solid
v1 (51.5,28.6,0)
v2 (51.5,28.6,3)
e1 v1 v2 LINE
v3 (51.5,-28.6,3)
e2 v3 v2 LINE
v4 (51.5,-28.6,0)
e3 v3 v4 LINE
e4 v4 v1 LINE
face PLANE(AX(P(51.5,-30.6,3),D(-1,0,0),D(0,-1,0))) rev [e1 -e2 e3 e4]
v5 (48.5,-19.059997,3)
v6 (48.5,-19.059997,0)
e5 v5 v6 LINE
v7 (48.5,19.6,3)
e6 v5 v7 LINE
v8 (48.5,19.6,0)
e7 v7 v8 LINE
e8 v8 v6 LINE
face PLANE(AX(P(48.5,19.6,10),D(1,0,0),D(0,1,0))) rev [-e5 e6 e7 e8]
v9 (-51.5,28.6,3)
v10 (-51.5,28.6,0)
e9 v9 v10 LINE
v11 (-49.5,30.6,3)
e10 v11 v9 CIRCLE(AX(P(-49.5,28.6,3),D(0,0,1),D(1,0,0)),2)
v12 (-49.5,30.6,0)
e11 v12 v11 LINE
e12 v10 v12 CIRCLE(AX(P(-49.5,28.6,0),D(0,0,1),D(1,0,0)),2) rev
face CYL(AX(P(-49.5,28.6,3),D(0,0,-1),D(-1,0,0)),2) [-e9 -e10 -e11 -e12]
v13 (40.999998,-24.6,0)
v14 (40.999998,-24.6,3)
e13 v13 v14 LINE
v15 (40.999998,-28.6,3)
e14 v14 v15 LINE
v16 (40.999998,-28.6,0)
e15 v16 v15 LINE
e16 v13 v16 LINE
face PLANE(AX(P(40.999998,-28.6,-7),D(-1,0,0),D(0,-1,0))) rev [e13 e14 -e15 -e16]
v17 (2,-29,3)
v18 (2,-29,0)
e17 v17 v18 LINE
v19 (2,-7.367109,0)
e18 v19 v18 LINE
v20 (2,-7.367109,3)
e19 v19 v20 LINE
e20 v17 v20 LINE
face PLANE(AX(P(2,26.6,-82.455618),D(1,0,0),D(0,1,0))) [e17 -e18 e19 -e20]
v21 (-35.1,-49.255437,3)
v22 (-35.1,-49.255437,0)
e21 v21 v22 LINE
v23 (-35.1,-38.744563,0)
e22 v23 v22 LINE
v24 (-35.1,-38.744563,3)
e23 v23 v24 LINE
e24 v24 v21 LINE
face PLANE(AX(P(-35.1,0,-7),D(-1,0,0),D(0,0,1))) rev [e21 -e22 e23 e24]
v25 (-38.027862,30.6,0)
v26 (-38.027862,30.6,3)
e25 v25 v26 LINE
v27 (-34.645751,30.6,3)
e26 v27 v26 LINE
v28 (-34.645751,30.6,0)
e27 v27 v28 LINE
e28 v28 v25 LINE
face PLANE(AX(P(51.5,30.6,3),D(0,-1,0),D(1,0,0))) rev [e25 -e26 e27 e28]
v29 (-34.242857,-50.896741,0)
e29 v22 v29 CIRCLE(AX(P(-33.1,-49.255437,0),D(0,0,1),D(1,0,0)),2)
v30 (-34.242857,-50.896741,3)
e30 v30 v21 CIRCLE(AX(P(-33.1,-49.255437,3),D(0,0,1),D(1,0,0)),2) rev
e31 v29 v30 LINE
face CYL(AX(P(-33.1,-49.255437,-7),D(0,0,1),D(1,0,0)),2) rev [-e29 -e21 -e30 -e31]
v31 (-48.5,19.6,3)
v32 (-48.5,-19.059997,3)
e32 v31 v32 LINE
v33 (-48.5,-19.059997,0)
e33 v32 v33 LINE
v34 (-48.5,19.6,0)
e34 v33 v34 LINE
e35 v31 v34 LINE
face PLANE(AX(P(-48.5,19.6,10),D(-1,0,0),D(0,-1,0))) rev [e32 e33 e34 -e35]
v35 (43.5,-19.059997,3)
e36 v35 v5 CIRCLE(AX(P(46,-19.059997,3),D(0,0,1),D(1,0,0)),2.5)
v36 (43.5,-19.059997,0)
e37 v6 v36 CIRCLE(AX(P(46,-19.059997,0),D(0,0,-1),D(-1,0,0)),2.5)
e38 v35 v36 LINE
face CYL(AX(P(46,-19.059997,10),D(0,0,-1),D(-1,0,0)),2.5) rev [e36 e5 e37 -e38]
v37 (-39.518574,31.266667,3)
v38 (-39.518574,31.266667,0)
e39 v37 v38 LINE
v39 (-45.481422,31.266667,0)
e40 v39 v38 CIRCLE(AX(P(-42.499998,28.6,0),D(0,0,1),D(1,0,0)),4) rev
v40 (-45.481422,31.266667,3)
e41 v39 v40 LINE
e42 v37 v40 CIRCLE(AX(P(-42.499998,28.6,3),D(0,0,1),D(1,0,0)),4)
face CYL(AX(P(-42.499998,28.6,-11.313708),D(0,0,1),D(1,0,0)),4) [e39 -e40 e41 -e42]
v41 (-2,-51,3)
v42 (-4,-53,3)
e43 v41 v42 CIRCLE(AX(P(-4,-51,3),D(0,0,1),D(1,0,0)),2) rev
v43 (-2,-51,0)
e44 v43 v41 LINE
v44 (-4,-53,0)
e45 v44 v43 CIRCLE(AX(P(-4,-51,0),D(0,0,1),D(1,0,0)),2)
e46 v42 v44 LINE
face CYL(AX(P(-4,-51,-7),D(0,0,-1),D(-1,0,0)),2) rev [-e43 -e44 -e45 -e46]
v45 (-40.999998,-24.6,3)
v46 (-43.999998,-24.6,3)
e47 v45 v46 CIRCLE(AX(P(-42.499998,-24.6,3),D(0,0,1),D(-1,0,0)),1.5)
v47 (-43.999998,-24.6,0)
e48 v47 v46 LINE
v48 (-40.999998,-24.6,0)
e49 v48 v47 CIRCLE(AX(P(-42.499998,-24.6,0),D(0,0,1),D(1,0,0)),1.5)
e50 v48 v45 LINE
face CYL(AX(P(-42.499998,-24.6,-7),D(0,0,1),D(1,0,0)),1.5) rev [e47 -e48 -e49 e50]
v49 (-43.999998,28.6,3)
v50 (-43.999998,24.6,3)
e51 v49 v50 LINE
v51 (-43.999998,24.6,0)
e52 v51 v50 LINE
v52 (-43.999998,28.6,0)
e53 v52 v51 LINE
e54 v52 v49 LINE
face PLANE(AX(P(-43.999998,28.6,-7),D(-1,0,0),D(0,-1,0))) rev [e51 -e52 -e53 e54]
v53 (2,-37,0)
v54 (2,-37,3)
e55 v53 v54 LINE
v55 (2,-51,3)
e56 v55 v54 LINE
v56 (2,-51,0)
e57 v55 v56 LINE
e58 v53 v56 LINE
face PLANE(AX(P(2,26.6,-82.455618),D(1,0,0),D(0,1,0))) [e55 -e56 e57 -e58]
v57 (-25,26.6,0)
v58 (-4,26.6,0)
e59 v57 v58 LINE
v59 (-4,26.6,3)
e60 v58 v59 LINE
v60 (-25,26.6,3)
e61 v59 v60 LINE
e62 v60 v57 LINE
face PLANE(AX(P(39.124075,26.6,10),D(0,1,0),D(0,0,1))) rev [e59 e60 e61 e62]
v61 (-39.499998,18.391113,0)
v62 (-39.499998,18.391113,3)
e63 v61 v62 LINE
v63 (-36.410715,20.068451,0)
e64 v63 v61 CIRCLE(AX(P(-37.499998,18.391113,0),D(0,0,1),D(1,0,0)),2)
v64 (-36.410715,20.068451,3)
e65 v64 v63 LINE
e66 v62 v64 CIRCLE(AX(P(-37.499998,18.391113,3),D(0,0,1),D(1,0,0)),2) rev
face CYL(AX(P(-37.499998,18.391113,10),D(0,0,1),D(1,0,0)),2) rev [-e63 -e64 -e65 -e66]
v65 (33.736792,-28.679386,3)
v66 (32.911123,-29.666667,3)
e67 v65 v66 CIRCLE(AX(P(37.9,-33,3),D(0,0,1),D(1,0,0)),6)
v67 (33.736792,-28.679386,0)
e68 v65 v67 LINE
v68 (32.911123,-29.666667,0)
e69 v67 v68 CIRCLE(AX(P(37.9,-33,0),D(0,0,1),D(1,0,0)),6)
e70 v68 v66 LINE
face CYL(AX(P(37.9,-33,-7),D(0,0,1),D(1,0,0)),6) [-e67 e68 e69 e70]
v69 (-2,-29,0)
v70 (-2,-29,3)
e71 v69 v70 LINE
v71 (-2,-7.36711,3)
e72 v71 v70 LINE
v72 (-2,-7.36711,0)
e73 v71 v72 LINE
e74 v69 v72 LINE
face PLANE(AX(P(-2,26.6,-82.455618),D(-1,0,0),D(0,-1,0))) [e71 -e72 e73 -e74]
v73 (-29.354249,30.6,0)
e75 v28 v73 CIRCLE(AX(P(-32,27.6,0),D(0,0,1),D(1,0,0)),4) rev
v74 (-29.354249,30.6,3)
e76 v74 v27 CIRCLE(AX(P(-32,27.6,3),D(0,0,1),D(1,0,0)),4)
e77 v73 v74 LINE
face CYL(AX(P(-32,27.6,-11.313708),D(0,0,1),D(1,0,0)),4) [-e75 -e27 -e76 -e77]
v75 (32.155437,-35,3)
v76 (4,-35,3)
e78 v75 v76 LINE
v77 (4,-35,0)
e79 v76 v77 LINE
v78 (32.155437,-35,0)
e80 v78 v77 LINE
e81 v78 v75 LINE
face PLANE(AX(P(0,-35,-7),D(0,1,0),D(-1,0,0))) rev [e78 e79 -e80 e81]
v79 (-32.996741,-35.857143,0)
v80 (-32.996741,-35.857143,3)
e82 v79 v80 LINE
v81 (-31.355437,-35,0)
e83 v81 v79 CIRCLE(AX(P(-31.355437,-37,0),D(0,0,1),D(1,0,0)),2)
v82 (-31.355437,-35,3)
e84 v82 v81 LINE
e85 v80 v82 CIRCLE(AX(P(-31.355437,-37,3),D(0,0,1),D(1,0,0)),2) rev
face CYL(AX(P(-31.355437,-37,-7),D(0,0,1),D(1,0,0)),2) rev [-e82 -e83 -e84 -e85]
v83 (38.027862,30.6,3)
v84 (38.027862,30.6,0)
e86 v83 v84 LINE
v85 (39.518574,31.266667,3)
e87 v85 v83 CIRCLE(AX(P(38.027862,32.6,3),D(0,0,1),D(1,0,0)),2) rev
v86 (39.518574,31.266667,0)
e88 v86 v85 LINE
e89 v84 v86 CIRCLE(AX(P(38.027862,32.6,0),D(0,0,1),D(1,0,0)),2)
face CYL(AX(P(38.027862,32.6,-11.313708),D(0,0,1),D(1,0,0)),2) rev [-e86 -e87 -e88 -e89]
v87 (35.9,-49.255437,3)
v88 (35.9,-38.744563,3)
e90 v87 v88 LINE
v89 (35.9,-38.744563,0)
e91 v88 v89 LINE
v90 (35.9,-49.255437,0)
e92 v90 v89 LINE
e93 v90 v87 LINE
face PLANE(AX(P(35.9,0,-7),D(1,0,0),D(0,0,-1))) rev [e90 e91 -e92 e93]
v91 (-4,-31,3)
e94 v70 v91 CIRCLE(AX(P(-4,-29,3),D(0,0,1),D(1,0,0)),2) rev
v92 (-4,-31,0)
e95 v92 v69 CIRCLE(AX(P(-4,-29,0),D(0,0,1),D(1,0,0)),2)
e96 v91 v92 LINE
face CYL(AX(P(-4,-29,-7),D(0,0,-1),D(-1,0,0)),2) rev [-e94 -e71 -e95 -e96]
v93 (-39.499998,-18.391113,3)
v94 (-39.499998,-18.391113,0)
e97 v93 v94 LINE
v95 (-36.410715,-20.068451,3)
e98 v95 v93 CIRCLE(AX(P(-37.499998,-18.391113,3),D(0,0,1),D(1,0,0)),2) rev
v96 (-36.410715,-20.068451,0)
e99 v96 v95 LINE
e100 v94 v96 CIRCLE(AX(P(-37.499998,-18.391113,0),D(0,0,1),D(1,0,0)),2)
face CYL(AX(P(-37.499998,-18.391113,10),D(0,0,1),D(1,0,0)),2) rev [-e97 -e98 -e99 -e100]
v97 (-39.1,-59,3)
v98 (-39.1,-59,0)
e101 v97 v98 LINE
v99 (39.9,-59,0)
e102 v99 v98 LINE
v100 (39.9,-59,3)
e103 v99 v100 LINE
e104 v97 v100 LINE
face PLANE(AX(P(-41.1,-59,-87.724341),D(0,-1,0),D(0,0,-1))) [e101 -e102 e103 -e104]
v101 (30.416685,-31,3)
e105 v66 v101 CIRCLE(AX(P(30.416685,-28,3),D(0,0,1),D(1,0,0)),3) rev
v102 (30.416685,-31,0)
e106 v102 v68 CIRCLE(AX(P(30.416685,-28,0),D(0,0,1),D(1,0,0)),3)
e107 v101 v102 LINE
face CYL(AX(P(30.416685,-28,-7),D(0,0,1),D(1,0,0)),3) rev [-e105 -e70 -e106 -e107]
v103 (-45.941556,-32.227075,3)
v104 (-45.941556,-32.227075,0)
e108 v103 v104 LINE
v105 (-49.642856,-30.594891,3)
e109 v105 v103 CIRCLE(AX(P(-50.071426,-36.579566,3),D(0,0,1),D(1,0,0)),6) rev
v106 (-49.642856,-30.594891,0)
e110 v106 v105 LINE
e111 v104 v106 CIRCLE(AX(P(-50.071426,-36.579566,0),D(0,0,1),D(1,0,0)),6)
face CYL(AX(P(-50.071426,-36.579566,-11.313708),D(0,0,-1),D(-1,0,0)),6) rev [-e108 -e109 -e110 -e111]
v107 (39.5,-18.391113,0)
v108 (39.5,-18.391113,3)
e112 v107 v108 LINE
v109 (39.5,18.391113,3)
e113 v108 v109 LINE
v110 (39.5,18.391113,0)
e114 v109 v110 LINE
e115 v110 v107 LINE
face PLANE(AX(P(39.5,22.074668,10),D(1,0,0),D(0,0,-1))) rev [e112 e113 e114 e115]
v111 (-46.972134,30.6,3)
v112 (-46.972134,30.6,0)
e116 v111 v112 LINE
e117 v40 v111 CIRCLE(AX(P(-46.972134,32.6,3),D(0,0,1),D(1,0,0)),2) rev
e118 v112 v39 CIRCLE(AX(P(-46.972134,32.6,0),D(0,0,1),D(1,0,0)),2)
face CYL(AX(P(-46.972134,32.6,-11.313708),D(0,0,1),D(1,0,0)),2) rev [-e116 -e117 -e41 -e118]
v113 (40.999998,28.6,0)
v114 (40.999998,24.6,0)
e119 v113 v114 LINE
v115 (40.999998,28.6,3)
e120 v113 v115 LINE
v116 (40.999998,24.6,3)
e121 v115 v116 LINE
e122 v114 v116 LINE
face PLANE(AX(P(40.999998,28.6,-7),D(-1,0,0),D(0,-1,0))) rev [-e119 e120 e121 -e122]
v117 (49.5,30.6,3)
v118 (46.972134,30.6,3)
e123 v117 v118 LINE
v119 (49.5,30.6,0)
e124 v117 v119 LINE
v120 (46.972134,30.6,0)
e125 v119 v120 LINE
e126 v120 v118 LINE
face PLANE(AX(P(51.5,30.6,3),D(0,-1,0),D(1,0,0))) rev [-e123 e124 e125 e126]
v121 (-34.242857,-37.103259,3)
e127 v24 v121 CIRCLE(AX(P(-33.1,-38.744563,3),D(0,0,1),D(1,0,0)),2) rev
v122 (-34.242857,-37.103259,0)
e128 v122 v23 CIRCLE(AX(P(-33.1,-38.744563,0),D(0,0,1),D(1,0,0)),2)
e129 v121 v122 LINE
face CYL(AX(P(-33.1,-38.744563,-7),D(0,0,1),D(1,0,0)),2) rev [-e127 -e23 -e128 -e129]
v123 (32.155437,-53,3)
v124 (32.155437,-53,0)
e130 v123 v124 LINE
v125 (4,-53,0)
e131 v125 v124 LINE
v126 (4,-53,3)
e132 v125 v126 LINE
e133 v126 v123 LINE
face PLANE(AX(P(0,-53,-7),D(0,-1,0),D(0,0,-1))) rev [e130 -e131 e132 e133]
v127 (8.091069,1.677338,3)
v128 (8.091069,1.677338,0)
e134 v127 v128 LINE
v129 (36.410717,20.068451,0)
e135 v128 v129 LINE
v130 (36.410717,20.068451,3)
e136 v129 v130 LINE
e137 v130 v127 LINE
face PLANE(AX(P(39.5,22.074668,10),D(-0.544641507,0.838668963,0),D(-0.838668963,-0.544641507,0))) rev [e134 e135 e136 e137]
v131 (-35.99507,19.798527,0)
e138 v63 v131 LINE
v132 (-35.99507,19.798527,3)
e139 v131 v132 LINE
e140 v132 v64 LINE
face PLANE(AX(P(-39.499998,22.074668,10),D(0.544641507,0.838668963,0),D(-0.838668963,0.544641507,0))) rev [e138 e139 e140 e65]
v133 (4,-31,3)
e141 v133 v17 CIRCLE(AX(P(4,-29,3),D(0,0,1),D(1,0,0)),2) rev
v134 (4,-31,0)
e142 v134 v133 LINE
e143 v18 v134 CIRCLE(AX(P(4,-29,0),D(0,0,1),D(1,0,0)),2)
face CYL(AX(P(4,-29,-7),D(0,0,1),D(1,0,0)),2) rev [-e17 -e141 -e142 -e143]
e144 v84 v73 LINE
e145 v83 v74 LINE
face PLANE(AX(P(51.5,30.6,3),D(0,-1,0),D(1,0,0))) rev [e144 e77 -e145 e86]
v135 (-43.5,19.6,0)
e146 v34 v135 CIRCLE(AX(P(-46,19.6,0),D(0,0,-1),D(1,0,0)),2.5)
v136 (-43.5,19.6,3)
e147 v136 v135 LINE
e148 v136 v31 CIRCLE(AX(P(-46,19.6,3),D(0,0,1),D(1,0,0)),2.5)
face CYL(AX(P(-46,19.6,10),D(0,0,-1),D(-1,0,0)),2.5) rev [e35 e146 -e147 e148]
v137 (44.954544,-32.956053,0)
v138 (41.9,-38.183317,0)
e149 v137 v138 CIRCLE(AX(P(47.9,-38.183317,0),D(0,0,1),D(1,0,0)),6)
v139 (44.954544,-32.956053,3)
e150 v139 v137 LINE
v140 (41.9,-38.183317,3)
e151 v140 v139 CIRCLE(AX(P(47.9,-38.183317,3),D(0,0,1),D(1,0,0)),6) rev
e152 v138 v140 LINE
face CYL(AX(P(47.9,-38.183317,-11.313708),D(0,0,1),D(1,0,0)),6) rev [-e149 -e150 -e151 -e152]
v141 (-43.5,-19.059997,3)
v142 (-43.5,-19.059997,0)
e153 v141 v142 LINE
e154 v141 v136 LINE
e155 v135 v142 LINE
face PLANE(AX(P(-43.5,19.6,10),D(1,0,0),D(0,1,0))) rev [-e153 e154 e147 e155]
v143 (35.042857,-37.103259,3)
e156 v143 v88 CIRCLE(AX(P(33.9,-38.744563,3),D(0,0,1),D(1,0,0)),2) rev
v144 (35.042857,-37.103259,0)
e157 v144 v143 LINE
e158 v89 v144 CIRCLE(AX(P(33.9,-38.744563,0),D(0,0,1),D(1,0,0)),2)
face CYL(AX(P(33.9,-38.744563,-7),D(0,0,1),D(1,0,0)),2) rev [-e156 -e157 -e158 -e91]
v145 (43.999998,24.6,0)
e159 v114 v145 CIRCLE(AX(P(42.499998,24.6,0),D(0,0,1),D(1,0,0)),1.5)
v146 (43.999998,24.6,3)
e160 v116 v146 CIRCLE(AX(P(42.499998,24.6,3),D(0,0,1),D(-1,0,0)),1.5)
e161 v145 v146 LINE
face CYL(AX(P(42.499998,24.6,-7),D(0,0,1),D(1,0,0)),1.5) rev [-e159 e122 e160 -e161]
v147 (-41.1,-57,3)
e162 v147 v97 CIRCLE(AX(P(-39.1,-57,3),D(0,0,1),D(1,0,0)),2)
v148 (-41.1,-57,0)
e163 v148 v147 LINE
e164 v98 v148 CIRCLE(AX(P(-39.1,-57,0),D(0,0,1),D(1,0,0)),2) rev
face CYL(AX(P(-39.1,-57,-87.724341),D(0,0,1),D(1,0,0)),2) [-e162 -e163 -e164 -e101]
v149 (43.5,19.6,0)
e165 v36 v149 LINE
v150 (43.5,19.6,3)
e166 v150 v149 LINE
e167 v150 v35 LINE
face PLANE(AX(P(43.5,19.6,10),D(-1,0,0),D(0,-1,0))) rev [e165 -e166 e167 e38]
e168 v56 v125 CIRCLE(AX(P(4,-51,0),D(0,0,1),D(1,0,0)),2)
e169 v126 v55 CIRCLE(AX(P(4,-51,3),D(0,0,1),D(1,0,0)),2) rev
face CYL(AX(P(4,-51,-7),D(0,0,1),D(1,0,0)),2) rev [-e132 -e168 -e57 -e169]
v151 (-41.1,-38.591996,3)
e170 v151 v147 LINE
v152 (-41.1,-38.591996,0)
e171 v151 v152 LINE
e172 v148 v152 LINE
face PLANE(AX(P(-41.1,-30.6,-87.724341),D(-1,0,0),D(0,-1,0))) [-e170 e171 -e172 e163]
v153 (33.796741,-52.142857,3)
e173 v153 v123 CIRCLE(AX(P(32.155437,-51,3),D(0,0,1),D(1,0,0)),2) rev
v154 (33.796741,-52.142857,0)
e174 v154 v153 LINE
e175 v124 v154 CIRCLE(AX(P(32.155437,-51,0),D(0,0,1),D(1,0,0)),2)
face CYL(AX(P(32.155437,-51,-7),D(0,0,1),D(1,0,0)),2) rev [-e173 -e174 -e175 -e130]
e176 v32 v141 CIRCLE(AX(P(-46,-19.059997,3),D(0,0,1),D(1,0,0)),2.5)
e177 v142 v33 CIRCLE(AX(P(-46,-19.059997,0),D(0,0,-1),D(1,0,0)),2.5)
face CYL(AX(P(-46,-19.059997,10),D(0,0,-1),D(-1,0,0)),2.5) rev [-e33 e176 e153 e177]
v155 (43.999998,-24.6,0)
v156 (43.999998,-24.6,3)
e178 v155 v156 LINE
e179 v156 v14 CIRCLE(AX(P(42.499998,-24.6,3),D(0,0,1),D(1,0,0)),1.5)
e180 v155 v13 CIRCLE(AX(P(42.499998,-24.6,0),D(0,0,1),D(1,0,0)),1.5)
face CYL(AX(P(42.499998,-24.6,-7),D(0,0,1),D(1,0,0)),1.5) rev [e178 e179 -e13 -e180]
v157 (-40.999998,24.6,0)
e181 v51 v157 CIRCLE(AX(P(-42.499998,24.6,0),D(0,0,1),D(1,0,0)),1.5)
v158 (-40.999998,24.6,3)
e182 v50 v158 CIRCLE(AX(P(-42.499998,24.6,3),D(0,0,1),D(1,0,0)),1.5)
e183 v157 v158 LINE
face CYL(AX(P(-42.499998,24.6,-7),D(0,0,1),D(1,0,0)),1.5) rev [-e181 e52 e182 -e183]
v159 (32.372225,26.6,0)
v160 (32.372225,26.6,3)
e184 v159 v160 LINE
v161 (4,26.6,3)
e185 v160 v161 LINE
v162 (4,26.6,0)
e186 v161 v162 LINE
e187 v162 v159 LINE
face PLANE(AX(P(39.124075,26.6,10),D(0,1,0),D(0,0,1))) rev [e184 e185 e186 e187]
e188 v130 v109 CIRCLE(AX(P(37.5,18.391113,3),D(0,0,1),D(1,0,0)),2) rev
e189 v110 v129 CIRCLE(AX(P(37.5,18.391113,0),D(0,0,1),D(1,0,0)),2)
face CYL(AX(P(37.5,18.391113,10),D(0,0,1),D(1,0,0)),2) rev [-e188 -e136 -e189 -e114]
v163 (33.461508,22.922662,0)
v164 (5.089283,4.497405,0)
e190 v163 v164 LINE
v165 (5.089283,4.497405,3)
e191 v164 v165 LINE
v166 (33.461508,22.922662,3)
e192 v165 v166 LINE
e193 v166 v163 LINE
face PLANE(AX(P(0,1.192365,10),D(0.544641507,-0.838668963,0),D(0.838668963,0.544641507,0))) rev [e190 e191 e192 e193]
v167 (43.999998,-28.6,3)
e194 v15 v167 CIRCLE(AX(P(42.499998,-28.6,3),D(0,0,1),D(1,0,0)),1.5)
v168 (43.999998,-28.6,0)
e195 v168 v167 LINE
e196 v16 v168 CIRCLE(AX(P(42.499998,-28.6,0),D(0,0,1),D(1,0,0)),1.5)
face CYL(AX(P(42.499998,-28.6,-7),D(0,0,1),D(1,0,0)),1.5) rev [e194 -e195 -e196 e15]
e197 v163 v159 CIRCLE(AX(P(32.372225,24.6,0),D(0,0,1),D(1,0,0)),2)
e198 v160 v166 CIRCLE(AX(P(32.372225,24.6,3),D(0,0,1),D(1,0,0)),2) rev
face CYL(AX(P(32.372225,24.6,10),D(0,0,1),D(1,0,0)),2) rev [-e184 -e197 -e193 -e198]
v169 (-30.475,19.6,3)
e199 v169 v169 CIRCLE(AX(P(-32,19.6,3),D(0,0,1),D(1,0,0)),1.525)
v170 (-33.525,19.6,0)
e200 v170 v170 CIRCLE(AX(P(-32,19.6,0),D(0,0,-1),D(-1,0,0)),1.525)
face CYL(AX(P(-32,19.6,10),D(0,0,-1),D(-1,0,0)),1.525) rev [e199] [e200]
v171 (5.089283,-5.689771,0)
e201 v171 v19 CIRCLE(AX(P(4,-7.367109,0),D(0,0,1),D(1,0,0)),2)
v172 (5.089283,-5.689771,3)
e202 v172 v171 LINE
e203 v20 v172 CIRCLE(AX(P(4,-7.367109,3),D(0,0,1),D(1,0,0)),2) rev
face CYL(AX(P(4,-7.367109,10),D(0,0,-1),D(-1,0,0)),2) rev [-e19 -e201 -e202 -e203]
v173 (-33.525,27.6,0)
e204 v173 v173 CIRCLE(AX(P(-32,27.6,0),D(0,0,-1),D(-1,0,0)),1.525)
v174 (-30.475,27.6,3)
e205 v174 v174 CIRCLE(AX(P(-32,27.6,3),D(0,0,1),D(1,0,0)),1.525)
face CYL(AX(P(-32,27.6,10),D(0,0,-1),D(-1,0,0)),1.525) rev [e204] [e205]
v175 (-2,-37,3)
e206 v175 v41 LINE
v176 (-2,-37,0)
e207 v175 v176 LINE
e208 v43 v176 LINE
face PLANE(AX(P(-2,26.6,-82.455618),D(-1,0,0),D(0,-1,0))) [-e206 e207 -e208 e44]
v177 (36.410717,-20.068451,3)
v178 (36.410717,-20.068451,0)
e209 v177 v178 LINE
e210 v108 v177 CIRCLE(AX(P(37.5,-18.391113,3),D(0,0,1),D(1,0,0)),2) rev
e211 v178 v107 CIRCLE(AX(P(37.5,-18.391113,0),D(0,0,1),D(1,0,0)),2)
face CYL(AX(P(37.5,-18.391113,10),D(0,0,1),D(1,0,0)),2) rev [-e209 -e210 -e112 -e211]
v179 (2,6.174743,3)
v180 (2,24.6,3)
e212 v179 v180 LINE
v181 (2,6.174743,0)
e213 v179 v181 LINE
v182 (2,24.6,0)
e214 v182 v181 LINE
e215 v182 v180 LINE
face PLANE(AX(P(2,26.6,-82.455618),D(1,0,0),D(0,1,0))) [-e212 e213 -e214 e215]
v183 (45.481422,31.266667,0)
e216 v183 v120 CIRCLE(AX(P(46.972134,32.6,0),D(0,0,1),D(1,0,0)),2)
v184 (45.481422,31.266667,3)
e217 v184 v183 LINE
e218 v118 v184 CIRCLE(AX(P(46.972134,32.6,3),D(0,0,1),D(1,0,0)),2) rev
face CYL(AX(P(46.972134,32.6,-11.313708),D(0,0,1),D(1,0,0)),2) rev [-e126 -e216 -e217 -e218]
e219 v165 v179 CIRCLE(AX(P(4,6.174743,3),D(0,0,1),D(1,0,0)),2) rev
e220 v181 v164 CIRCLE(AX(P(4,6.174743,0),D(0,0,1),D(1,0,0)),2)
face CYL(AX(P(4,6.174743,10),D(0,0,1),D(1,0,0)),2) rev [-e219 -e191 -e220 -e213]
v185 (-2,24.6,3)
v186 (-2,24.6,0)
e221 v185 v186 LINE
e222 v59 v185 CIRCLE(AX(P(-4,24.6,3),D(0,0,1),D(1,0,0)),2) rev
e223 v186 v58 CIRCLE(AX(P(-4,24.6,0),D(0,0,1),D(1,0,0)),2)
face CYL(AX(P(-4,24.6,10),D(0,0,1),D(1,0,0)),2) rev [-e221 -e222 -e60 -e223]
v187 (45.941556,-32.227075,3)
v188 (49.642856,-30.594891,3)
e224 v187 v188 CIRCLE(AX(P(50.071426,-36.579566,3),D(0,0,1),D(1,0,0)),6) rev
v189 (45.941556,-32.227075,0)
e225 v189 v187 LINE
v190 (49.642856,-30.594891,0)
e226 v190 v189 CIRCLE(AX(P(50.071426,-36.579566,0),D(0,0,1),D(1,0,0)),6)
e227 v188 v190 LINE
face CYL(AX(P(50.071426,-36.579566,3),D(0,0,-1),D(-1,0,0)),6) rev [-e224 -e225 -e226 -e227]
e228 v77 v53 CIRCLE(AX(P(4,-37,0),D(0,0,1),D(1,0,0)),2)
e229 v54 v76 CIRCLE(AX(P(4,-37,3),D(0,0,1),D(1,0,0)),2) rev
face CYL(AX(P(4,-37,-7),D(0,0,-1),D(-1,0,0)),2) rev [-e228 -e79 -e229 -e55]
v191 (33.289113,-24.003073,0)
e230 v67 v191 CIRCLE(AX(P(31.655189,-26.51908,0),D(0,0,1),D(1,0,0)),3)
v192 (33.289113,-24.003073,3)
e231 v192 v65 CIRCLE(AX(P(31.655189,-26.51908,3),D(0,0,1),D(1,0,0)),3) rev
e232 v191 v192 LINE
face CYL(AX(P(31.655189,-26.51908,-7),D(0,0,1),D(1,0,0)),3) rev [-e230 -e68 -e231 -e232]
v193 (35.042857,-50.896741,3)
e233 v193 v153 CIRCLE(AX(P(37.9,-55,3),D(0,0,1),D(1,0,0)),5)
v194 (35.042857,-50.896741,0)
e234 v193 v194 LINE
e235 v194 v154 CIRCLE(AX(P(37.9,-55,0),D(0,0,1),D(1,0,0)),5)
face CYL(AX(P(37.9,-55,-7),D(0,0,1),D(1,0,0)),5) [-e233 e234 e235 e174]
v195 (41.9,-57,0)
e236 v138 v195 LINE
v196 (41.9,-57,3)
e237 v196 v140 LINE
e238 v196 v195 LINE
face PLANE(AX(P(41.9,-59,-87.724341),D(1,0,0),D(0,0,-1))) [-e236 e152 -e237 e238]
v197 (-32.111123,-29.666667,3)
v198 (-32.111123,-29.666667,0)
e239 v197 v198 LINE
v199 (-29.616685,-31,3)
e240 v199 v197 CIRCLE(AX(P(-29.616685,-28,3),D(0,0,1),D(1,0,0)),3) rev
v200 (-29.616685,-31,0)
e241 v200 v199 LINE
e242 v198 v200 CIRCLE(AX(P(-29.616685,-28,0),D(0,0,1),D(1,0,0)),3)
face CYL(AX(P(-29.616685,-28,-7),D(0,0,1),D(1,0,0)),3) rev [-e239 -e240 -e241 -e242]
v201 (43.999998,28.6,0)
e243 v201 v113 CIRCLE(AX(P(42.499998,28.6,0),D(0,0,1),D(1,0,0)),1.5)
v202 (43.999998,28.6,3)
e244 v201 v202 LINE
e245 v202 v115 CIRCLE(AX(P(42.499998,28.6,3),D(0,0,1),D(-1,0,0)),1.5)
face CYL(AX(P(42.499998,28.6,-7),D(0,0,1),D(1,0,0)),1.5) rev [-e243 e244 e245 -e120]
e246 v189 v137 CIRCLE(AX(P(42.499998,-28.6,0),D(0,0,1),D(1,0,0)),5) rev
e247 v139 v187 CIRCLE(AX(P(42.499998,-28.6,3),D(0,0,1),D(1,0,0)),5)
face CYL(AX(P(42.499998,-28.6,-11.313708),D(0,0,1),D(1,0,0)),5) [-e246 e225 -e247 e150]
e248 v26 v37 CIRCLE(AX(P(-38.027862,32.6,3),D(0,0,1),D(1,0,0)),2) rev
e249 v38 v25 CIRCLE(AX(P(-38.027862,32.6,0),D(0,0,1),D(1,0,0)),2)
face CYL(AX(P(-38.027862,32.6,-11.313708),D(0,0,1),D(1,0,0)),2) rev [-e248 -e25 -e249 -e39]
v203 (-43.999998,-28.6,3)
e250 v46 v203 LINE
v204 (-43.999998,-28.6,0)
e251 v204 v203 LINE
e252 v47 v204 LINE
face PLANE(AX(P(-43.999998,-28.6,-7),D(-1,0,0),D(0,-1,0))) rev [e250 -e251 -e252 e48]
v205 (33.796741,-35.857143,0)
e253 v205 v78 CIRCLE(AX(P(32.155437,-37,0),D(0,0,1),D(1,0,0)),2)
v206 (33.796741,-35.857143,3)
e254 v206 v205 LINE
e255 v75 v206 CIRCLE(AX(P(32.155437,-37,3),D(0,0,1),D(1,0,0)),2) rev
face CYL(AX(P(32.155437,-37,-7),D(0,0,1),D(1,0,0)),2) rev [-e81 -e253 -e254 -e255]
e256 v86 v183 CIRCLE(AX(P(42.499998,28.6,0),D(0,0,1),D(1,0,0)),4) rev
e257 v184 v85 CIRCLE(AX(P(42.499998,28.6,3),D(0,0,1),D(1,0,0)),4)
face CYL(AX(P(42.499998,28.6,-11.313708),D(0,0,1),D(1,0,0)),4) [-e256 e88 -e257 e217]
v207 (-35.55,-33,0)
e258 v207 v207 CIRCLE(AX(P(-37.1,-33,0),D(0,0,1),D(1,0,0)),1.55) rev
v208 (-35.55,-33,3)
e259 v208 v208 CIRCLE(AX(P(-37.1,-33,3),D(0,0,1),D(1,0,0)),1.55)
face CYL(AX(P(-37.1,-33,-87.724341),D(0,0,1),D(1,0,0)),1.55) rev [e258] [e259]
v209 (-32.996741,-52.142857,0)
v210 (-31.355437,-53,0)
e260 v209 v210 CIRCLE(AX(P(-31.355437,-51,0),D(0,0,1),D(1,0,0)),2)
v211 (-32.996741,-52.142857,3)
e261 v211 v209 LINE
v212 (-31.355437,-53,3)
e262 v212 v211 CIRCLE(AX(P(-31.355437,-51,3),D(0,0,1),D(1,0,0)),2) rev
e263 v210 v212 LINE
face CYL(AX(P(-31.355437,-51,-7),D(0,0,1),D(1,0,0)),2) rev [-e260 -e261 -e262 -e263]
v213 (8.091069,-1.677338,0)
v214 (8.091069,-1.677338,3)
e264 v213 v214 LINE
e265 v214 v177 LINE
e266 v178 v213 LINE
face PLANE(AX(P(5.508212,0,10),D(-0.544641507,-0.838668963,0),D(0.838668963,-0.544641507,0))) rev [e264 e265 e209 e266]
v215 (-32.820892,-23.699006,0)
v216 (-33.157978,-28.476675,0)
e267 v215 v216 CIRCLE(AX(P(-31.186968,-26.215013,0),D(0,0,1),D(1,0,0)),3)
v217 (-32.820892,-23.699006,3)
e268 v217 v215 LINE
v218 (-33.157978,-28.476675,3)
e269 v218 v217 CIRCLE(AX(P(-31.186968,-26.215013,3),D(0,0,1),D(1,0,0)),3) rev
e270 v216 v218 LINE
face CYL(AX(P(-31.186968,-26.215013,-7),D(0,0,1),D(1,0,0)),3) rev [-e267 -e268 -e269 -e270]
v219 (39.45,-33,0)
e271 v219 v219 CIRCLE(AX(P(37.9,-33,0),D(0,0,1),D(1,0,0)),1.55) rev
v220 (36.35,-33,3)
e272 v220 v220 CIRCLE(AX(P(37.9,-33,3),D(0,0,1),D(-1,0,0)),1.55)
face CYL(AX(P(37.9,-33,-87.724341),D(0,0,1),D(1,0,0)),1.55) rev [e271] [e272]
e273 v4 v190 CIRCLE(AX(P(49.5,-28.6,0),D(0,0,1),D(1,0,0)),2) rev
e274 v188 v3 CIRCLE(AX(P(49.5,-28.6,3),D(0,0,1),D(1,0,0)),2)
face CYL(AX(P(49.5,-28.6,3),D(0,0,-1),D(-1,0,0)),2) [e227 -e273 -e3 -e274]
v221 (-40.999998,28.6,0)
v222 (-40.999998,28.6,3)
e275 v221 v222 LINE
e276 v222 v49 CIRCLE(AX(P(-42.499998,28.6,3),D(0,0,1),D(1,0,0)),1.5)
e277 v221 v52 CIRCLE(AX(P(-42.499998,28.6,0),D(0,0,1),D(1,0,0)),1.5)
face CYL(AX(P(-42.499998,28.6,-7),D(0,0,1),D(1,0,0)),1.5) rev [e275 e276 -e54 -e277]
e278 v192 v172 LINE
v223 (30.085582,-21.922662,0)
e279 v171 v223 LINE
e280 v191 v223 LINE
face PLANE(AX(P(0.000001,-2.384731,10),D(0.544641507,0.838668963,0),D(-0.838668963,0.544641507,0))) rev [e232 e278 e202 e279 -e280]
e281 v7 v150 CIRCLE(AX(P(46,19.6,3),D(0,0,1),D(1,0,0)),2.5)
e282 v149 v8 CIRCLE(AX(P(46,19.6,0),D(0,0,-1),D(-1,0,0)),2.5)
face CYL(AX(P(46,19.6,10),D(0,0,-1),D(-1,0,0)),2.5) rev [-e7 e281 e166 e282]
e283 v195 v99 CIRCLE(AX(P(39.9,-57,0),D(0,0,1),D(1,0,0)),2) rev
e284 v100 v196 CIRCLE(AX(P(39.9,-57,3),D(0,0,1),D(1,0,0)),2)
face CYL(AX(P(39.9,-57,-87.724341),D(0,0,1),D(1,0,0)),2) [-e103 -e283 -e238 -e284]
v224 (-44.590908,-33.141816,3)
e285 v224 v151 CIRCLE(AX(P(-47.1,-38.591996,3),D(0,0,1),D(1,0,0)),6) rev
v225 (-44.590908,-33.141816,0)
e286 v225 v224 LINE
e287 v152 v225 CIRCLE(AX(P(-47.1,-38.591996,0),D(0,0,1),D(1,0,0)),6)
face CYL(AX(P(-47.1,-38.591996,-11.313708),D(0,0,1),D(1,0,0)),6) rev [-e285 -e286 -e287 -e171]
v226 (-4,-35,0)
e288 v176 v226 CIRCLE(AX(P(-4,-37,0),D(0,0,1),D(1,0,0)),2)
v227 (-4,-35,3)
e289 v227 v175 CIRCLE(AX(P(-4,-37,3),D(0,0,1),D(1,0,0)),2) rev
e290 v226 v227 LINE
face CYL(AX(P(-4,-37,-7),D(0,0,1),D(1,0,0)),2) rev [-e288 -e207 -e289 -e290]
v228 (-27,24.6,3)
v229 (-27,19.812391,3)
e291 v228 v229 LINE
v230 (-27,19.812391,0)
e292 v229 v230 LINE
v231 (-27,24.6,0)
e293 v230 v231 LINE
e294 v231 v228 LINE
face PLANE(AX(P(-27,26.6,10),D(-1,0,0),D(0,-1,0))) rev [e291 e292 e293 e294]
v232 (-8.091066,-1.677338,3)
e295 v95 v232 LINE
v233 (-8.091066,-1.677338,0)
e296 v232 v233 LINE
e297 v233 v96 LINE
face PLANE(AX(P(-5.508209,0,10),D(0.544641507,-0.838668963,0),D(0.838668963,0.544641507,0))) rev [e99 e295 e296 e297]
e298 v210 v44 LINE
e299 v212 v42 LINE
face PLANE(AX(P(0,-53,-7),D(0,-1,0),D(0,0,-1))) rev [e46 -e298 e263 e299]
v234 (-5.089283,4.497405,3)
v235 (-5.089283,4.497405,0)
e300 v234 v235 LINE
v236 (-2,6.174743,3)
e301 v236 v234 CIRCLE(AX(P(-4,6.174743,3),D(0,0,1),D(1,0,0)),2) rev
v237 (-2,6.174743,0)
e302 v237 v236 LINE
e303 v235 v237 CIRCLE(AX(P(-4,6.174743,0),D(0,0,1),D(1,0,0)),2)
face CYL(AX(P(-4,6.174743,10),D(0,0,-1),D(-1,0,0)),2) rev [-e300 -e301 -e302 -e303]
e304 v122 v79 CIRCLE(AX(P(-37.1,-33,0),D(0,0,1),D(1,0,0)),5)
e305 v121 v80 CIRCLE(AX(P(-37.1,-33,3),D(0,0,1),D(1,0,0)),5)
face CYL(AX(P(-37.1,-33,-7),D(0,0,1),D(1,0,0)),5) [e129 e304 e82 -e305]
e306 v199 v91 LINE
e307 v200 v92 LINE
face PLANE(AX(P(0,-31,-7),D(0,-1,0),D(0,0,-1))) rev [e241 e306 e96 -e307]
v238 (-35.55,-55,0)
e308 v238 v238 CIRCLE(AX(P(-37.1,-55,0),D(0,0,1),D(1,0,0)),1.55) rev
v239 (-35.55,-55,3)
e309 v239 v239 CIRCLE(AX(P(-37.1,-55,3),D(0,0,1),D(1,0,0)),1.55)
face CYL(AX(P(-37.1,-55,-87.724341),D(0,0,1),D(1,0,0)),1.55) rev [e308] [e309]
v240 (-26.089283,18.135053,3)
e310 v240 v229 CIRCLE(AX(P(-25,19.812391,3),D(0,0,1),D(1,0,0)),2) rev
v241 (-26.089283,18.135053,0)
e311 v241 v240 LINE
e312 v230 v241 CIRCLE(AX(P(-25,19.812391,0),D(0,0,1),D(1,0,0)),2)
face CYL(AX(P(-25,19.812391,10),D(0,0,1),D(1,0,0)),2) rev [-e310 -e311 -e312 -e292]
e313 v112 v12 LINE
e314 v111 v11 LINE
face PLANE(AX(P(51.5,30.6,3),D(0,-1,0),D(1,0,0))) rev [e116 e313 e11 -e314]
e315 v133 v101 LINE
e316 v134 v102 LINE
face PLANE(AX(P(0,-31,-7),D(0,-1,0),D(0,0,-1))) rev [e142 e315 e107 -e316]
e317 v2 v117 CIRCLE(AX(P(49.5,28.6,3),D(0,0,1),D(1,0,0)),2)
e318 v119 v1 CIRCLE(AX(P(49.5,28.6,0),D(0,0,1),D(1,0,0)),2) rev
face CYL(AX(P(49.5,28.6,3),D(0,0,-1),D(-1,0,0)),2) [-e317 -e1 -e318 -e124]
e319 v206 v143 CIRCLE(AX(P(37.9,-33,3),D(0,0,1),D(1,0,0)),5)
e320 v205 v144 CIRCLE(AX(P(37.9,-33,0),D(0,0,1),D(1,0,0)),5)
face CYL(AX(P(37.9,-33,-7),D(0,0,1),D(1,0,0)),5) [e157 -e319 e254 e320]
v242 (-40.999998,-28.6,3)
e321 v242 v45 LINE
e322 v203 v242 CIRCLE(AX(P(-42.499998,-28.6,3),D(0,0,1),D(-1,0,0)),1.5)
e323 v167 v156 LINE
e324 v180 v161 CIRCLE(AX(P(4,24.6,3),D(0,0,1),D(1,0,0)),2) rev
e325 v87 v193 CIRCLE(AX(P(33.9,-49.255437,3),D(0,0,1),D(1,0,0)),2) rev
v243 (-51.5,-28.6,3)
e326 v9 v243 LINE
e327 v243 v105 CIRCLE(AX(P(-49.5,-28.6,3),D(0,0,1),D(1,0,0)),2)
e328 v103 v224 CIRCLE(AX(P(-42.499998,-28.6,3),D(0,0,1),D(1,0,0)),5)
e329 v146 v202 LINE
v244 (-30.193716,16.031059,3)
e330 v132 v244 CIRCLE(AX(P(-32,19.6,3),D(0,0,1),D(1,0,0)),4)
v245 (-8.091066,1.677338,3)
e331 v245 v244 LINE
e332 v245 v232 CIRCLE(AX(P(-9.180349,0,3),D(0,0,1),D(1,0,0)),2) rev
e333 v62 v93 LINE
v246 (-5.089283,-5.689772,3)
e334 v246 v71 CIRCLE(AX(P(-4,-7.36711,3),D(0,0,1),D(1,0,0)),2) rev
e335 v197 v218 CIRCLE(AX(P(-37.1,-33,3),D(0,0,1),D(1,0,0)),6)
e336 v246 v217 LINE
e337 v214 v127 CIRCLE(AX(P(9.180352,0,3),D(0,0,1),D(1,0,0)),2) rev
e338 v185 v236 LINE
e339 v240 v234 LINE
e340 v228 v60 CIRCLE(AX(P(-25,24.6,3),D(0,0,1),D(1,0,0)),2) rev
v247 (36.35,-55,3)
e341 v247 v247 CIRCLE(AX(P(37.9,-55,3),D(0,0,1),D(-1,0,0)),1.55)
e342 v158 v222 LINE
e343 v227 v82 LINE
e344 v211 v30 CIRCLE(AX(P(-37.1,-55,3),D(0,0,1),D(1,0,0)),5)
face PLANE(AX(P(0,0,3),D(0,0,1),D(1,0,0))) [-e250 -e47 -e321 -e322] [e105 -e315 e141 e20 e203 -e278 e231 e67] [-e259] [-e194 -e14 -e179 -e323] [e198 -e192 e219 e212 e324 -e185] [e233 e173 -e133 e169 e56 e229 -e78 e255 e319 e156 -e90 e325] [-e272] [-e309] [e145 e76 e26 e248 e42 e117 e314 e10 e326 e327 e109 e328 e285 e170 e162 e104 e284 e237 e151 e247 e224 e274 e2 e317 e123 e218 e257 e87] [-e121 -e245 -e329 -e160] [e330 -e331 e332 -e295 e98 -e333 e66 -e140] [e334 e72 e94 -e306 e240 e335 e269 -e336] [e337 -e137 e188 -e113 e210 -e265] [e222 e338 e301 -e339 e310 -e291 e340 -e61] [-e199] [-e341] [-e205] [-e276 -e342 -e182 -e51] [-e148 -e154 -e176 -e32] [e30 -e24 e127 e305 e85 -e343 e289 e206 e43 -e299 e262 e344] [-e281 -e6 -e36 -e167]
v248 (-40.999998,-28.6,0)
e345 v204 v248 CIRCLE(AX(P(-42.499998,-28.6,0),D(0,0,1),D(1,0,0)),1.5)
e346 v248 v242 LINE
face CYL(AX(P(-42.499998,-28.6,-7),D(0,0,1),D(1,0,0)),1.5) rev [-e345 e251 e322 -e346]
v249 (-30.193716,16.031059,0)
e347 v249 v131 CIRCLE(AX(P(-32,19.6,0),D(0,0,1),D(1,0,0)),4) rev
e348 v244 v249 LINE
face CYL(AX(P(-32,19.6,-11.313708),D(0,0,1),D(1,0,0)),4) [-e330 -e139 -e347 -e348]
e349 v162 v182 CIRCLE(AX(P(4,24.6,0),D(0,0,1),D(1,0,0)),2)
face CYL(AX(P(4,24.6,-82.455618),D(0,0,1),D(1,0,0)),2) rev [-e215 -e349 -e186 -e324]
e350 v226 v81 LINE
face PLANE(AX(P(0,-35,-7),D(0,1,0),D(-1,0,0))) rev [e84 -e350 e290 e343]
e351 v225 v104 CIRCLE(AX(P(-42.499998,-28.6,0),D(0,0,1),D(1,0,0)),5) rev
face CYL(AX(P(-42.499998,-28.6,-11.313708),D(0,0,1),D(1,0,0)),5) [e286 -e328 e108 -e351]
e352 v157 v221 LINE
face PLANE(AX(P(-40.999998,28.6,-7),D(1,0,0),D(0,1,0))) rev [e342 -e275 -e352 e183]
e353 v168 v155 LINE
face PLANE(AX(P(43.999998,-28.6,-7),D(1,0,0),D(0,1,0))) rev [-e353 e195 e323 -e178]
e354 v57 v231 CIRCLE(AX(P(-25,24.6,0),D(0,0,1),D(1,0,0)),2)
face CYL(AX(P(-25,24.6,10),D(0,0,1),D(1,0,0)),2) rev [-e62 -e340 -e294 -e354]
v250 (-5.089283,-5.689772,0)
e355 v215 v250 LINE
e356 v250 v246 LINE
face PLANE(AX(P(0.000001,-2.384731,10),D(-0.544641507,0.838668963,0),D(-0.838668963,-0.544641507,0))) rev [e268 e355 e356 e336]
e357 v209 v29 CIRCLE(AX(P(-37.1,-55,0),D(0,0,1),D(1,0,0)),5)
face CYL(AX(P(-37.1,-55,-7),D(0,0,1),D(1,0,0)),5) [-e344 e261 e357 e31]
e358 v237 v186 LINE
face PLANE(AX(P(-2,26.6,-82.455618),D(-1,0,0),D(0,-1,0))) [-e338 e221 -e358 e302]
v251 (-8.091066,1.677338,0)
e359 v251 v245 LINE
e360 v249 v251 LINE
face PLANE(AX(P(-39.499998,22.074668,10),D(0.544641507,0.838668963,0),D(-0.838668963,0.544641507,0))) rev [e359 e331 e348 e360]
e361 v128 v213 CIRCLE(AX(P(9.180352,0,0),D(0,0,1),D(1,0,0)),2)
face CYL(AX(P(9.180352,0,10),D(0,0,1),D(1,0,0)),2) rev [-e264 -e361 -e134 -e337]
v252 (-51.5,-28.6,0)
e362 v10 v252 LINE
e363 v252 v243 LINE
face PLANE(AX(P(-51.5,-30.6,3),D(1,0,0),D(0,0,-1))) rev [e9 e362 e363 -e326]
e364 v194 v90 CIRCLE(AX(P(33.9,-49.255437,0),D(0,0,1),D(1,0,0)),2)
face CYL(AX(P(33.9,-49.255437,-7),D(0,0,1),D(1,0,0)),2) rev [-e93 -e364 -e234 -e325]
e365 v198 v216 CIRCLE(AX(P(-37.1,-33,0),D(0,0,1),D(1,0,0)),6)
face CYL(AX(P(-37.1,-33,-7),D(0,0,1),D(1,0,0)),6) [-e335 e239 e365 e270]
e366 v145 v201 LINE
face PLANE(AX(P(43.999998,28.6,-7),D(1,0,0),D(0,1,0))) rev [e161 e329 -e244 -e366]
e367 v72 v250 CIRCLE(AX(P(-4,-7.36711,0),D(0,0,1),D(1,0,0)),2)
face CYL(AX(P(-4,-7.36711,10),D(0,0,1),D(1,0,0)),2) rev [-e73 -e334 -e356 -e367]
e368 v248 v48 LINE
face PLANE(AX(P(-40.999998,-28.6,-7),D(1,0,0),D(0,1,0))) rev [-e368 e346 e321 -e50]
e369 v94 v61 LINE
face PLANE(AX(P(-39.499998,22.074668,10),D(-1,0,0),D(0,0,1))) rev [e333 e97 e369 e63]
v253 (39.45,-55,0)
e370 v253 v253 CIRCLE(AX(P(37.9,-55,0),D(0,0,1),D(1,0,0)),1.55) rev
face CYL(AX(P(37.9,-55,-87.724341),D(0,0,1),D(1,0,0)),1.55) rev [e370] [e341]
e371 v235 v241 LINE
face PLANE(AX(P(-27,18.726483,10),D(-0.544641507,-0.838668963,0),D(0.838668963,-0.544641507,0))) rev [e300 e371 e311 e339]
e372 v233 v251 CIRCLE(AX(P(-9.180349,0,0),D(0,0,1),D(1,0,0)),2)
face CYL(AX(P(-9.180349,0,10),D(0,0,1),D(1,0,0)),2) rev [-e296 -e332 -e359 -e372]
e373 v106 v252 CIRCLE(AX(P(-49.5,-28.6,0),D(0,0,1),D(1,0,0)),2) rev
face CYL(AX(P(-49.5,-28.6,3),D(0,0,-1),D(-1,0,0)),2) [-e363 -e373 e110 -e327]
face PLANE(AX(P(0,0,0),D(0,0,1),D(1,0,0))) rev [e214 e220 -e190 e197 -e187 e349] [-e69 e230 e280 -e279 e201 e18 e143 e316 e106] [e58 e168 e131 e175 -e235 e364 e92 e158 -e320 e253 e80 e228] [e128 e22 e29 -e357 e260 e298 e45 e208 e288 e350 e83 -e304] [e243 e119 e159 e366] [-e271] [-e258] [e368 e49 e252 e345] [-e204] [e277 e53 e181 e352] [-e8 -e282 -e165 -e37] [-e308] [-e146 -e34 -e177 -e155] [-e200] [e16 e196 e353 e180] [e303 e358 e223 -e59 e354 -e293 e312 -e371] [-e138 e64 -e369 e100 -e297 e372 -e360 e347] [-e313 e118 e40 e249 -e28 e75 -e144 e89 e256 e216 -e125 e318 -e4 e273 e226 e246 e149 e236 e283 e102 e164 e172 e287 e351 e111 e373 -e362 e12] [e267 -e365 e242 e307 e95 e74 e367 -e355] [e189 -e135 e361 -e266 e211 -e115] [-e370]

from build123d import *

# Parameters (mm, degrees)
SKETCH_1_W          = 103
SKETCH_1_H          = 61.2
EXTRUDE_1_DEPTH     = 3
SKETCH_2_R          = 1.5
SKETCH_2_R_2        = 1.525
CUT_EXTRUDE_1_DEPTH = 10
SKETCH_3_W          = 83
SKETCH_3_H          = 28.4
SKETCH_3_R          = 1.55
EXTRUDE_2_DEPTH     = 3
CUT_EXTRUDE_5_DEPTH = 10
FILLET_1_R          = 2
CUT_EXTRUDE_2_DEPTH = 10
FILLET_3_R          = 2
CUT_EXTRUDE_3_DEPTH = 10
EXTRUDE_3_DEPTH     = 3
FILLET_2_R          = 2
CUT_EXTRUDE_4_DEPTH = 10
FILLET_4_R          = 3
FILLET_6_R          = 6
SKETCH_11_W         = 4
SKETCH_11_H         = 82.358538581
EXTRUDE_4_DEPTH     = 3
FILLET_7_R          = 2


with BuildPart() as part:
    # 草图1 → 凸台-拉伸1 (new body)
    with BuildSketch(Plane.XY):
        Rectangle(SKETCH_1_W, SKETCH_1_H)
    extrude(amount=EXTRUDE_1_DEPTH)

    # 草图2 → 切除-拉伸1 (cut)
    with BuildSketch(Plane(origin=(0, 0, 0), x_dir=(-1, 0, 0), z_dir=(0, 0, -1))):
        with Locations((-42.5, 27.6)):
            Circle(SKETCH_2_R)
        with Locations((-42.5, -27.6)):
            Circle(SKETCH_2_R)
        with Locations((42.499997562, -27.6)):
            Circle(SKETCH_2_R)
        with Locations((42.499997562, 27.6)):
            Circle(SKETCH_2_R)
        with Locations((32, 27.6)):
            Circle(SKETCH_2_R_2)
        with Locations((32, 19.6)):
            Circle(SKETCH_2_R_2)
        Polygon((-39.5, 22.074667925), (-39.5, -22.074667925), (-5.508211597, 0), align=None)
        Polygon((-1.219e-06, -2.38473115), (-35.748149691, -25.6), (35.748147253, -25.6), align=None)
        Polygon((39.499997562, 22.074667925), (5.50820916, 0), (39.499997562, -22.074667925), align=None)
        with BuildLine():
            Line((-43.5, 19.6), (-43.5, -19.059996805))
            ThreePointArc((-43.5, -19.059996805), (-46, -21.559996805), (-48.5, -19.059996805))
            Line((-48.5, -19.059996805), (-48.5, 19.6))
            ThreePointArc((-48.5, 19.6), (-46, 22.1), (-43.5, 19.6))
        make_face()
        with BuildLine():
            Line((43.5, 19.6), (43.5, -19.059996805))
            ThreePointArc((43.5, -19.059996805), (46, -21.559996805), (48.5, -19.059996805))
            Line((48.5, -19.059996805), (48.5, 19.6))
            ThreePointArc((48.5, 19.6), (46, 22.1), (43.5, 19.6))
        make_face()
    extrude(amount=-CUT_EXTRUDE_1_DEPTH, mode=Mode.SUBTRACT)

    # 草图3 → 凸台-拉伸2 (add)
    with BuildSketch(Plane.XY.offset(3)):
        with Locations((0.4, -44.8)):
            Rectangle(SKETCH_3_W, SKETCH_3_H)
        with Locations((-37.1, -33)):
            Circle(SKETCH_3_R, mode=Mode.SUBTRACT)
        with Locations((-37.1, -55)):
            Circle(SKETCH_3_R, mode=Mode.SUBTRACT)
        with Locations((37.9, -55)):
            Circle(SKETCH_3_R, mode=Mode.SUBTRACT)
        with Locations((37.9, -33)):
            Circle(SKETCH_3_R, mode=Mode.SUBTRACT)
    extrude(amount=-EXTRUDE_2_DEPTH)

    # 草图10 → 切除-拉伸5 (cut)
    with BuildSketch(Plane(origin=(0, 0, 0), x_dir=(-1, 0, 0), z_dir=(0, 0, -1))):
        Polygon((-39.124074846, 26.6), (27, 26.6), (27, 18.726482933), (0, 1.192364783), align=None)
    extrude(amount=-CUT_EXTRUDE_5_DEPTH, mode=Mode.SUBTRACT)

    # 圆角1
    fillet_1_edges = [part.edges().sort_by_distance(p)[0] for p in [
        (0, 1.192364783, 1.5),
        (39.124074846, 26.6, 1.5),
        (-27, 26.6, 1.5),
        (-27, 18.726482933, 1.5),
        (-39.499997562, 22.074667925, 1.5),
        (-39.499997562, -22.074667925, 1.5),
        (-5.50820916, 0, 1.5),
        (1.219e-06, -2.38473115, 1.5),
        (-35.748147253, -25.6, 1.5),
        (35.748149691, -25.6, 1.5),
        (39.5, 22.074667925, 1.5),
        (5.508211597, 0, 1.5),
        (39.5, -22.074667925, 1.5),
        (-51.5, 30.6, 1.5),
        (51.5, 30.6, 1.5),
        (51.5, -30.6, 1.5),
        (-51.5, -30.6, 1.5),
    ]]
    fillet(fillet_1_edges, radius=FILLET_1_R)

    # 草图4 → 切除-拉伸2 (cut)
    with BuildSketch(Plane.XY.offset(3)):
        with BuildLine():
            ThreePointArc((-32.517424305, -35), (-33.564466094, -36.535533906), (-35.1, -37.582575695))
            Line((-35.1, -37.582575695), (-35.1, -50.417424305))
            ThreePointArc((-35.1, -50.417424305), (-33.564466094, -51.464466094), (-32.517424305, -53))
            Line((-32.517424305, -53), (33.317424305, -53))
            ThreePointArc((33.317424305, -53), (34.364466094, -51.464466094), (35.9, -50.417424305))
            Line((35.9, -50.417424305), (35.9, -37.582575695))
            ThreePointArc((35.9, -37.582575695), (34.364466094, -36.535533906), (33.317424305, -35))
            Line((33.317424305, -35), (-32.517424305, -35))
        make_face()
    extrude(amount=-CUT_EXTRUDE_2_DEPTH, mode=Mode.SUBTRACT)

    # 圆角3
    fillet_3_edges = [part.edges().sort_by_distance(p)[0] for p in [
        (35.9, -50.417424305, 1.5),
        (33.317424305, -53, 1.5),
        (-32.517424305, -53, 1.5),
        (-35.1, -50.417424305, 1.5),
        (-35.1, -37.582575695, 1.5),
        (-32.517424305, -35, 1.5),
        (33.317424305, -35, 1.5),
        (35.9, -37.582575695, 1.5),
    ]]
    fillet(fillet_3_edges, radius=FILLET_3_R)

    # 草图6 → 切除-拉伸3 (cut)
    with BuildSketch(Plane.XY.offset(3)):
        with BuildLine():
            Line((-40.999997562, 28.6), (-40.999997562, 24.6))
            ThreePointArc((-40.999997562, 24.6), (-42.499997562, 23.1), (-43.999997562, 24.6))
            Line((-43.999997562, 24.6), (-43.999997562, 28.6))
            ThreePointArc((-43.999997562, 28.6), (-42.499997562, 30.1), (-40.999997562, 28.6))
        make_face()
        with BuildLine():
            Line((-40.999997562, -28.6), (-40.999997562, -24.6))
            ThreePointArc((-40.999997562, -24.6), (-42.499997562, -23.1), (-43.999997562, -24.6))
            Line((-43.999997562, -24.6), (-43.999997562, -28.6))
            ThreePointArc((-43.999997562, -28.6), (-42.499997562, -30.1), (-40.999997562, -28.6))
        make_face()
        with BuildLine():
            Line((40.999997562, -28.6), (40.999997562, -24.6))
            ThreePointArc((40.999997562, -24.6), (42.499997562, -23.1), (43.999997562, -24.6))
            Line((43.999997562, -24.6), (43.999997562, -28.6))
            ThreePointArc((43.999997562, -28.6), (42.499997562, -30.1), (40.999997562, -28.6))
        make_face()
        with BuildLine():
            Line((40.999997562, 28.6), (40.999997562, 24.6))
            ThreePointArc((40.999997562, 24.6), (42.499997562, 23.1), (43.999997562, 24.6))
            Line((43.999997562, 24.6), (43.999997562, 28.6))
            ThreePointArc((43.999997562, 28.6), (42.499997562, 30.1), (40.999997562, 28.6))
        make_face()
    extrude(amount=-CUT_EXTRUDE_3_DEPTH, mode=Mode.SUBTRACT)

    # 草图7 → 凸台-拉伸3 (add)
    with BuildSketch(Plane.XY.offset(3)):
        with BuildLine():
            Line((39.035895947, 30.6), (45.964099177, 30.6))
            ThreePointArc((45.964099177, 30.6), (42.499997562, 32.6), (39.035895947, 30.6))
        make_face()
        with BuildLine():
            Line((-34.645751311, 30.6), (-29.354248689, 30.6))
            ThreePointArc((-29.354248689, 30.6), (-32, 31.6), (-34.645751311, 30.6))
        make_face()
        with BuildLine():
            ThreePointArc((41.9, -33.563869753), (44.982206885, -32.940349856), (47.082573257, -30.6))
            Line((47.082573257, -30.6), (41.9, -30.6))
            Line((41.9, -30.6), (41.9, -33.563869753))
        make_face()
        with BuildLine():
            Line((-45.964099177, 30.6), (-39.035895947, 30.6))
            ThreePointArc((-39.035895947, 30.6), (-42.499997562, 32.6), (-45.964099177, 30.6))
        make_face()
        with BuildLine():
            Line((-30.193716195, 16.031059146), (-35.995070346, 19.798526892))
            ThreePointArc((-35.995070346, 19.798526892), (-34.178566027, 16.245324149), (-30.193716195, 16.031059146))
        make_face()
        with BuildLine():
            ThreePointArc((-47.082573257, -30.6), (-44.619479076, -33.128553645), (-41.1, -33.400000711))
            Line((-41.1, -33.400000711), (-41.1, -30.6))
            Line((-41.1, -30.6), (-47.082573257, -30.6))
        make_face()
    extrude(amount=-EXTRUDE_3_DEPTH)

    # 圆角2
    fillet_2_edges = [part.edges().sort_by_distance(p)[0] for p in [
        (-41.1, -59, 1.5),
        (41.9, -59, 1.5),
        (-39.035895947, 30.6, 1.5),
        (-45.964099177, 30.6, 1.5),
        (45.964099177, 30.6, 1.5),
        (39.035895947, 30.6, 1.5),
    ]]
    fillet(fillet_2_edges, radius=FILLET_2_R)

    # 草图8 → 切除-拉伸4 (cut)
    with BuildSketch(Plane.XY.offset(3)):
        with BuildLine():
            Line((0, -31), (0, -2.384731941))
            Line((0, -2.384731941), (-38.011080882, -27.069575763))
            ThreePointArc((-38.011080882, -27.069575763), (-34.018985575, -27.851471073), (-31.443145751, -31))
            Line((-31.443145751, -31), (0, -31))
        make_face()
        with BuildLine():
            Line((37.903948732, -27.000001299), (0, -2.384731941))
            Line((0, -2.384731941), (0, -31))
            Line((0, -31), (32.243145751, -31))
            ThreePointArc((32.243145751, -31), (34.437510635, -28.099880879), (37.903948732, -27.000001299))
        make_face()
    extrude(amount=-CUT_EXTRUDE_4_DEPTH, mode=Mode.SUBTRACT)

    # 圆角4
    # the kernel refuses this fillet: 3 mm, written as the material it adds along each edge
    with BuildSketch(Plane(origin=(32.243145751, -31, 3), x_dir=(0.4479167728471886, 0.8940752566770652, 0), z_dir=(0, 0, -1))) as fillet_4_piece_1:
        with BuildLine():
            CenterArc((1.864123466, -2.97674348), FILLET_4_R, 97.138883981, 56.251011404)
            Line((-0.818102304, -1.632993162), (-0.871746819, -1.606118155))
            Line((-0.871746819, -1.606118155), (-0.053644515, 0.026875006))
            Line((-0.053644515, 0.026875006), (0.007456494, 0.05953487))
            ThreePointArc((0.007456494, 0.05953487), (0.745649387, 0.013486961), (1.483842279, 0.05953487))
            Line((1.483842279, 0.05953487), (1.491298773, 0))
        make_face()
    extrude(amount=3)
    with BuildSketch(Plane(origin=(-31.443145751, -31, 3), x_dir=(1, 0, 0), z_dir=(0, 0, -1))) as fillet_4_piece_2:
        with BuildLine():
            CenterArc((1.826460524, -3), FILLET_4_R, 90, 56.251011404)
            Line((-0.667977734, -1.333333333), (-0.717866499, -1.3))
            ThreePointArc((-0.717866499, -1.3), (-0.346047225, -0.660625631), (-0.056568542, 0.02))
            Line((-0.056568542, 0.02), (0, 0.06))
            Line((0, 0.06), (1.826460524, 0.06))
            Line((1.826460524, 0.06), (1.826460524, 0))
        make_face()
    extrude(amount=3)
    with BuildSketch(Plane(origin=(37.903948732, -27.000001299, 3), x_dir=(-0.8386689787810934, 0.5446414821056857, 0), z_dir=(0, 0, -1))) as fillet_4_piece_3:
        with BuildLine():
            CenterArc((5.502571293, -3), FILLET_4_R, 90, 103.062756756)
            Line((2.580202026, -3.678054475), (2.521754641, -3.691615565))
            ThreePointArc((2.521754641, -3.691615565), (1.598242731, -1.622861901), (-0.032645365, -0.050341634))
            Line((-0.032645365, -0.050341634), (0, 0.06))
            Line((0, 0.06), (5.502571293, 0.06))
            Line((5.502571293, 0.06), (5.502571293, 0))
        make_face()
    extrude(amount=3)
    with BuildSketch(Plane(origin=(-38.011080882, -27.069575763, 3), x_dir=(0.9604450270381002, -0.278469657301802, 0), z_dir=(0, 0, -1))) as fillet_4_piece_4:
        with BuildLine():
            CenterArc((6.316215768, -2.721069043), FILLET_4_R, 114.902857597, 105.92808325)
            Line((4.046289512, -4.682556945), (4.000890987, -4.721786703))
            Line((4.000890987, -4.721786703), (-0.045398525, -0.039229758))
            Line((-0.045398525, -0.039229758), (0.025264863, 0.054421381))
            ThreePointArc((0.025264863, 0.054421381), (2.526486307, -0.497861915), (5.027707751, 0.054421381))
            Line((5.027707751, 0.054421381), (5.052972614, 0))
        make_face()
    extrude(amount=3)
    with BuildSketch(Plane(origin=(0, -2.384731941, 3), x_dir=(-0.8386689627806916, -0.5446415067439856, 0), z_dir=(0, 0, -1))) as fillet_4_piece_5:
        with BuildLine():
            CenterArc((FILLET_4_R * 0.649411762447, -FILLET_4_R), FILLET_4_R, 90, 66.000336041)
            Line((-FILLET_4_R * 0.2641360807, -FILLET_4_R * 0.593268714899), (-FILLET_4_R * 0.282407037563, -FILLET_4_R * 0.585134089197))
            Line((-FILLET_4_R * 0.282407037563, -FILLET_4_R * 0.585134089197), (-FILLET_4_R * 0.0129882352489, FILLET_4_R * 0.02))
            Line((-FILLET_4_R * 0.0129882352489, FILLET_4_R * 0.02), (FILLET_4_R * 0.649411762447, FILLET_4_R * 0.02))
            Line((FILLET_4_R * 0.649411762447, FILLET_4_R * 0.02), (FILLET_4_R * 0.649411762447, 0))
        make_face()
    extrude(amount=3)

    # 圆角6
    fillet_6_edges = [part.edges().sort_by_distance(p)[0] for p in [
        (-47.082573257, -30.6, 1.5),
        (47.082573257, -30.6, 1.5),
        (41.9, -33.563869753, 1.5),
        (-41.1, -33.400000711, 1.5),
    ]]
    fillet(fillet_6_edges, radius=FILLET_6_R)

    # 草图11 → 凸台-拉伸4 (add)
    with BuildSketch(Plane.XY.offset(3)):
        with Locations((0, -14.579269291)):
            Rectangle(SKETCH_11_W, SKETCH_11_H)
    extrude(amount=-EXTRUDE_4_DEPTH)

    # 圆角7
    fillet_7_edges = [part.edges().sort_by_distance(p)[0] for p in [
        (-2, -31, 1.5),
        (2, -31, 1.5),
        (2, 26.6, 1.5),
        (2, -53, 1.5),
        (2, -3.683553925, 1.5),
        (2, 2.49118835, 1.5),
        (-2, -53, 1.5),
        (-2, -3.683555508, 1.5),
        (-2, 2.49118835, 1.5),
        (-2, 26.6, 1.5),
        (2, -35, 1.5),
        (-2, -35, 1.5),
    ]]
    fillet(fillet_7_edges, radius=FILLET_7_R)


solid = part.part
